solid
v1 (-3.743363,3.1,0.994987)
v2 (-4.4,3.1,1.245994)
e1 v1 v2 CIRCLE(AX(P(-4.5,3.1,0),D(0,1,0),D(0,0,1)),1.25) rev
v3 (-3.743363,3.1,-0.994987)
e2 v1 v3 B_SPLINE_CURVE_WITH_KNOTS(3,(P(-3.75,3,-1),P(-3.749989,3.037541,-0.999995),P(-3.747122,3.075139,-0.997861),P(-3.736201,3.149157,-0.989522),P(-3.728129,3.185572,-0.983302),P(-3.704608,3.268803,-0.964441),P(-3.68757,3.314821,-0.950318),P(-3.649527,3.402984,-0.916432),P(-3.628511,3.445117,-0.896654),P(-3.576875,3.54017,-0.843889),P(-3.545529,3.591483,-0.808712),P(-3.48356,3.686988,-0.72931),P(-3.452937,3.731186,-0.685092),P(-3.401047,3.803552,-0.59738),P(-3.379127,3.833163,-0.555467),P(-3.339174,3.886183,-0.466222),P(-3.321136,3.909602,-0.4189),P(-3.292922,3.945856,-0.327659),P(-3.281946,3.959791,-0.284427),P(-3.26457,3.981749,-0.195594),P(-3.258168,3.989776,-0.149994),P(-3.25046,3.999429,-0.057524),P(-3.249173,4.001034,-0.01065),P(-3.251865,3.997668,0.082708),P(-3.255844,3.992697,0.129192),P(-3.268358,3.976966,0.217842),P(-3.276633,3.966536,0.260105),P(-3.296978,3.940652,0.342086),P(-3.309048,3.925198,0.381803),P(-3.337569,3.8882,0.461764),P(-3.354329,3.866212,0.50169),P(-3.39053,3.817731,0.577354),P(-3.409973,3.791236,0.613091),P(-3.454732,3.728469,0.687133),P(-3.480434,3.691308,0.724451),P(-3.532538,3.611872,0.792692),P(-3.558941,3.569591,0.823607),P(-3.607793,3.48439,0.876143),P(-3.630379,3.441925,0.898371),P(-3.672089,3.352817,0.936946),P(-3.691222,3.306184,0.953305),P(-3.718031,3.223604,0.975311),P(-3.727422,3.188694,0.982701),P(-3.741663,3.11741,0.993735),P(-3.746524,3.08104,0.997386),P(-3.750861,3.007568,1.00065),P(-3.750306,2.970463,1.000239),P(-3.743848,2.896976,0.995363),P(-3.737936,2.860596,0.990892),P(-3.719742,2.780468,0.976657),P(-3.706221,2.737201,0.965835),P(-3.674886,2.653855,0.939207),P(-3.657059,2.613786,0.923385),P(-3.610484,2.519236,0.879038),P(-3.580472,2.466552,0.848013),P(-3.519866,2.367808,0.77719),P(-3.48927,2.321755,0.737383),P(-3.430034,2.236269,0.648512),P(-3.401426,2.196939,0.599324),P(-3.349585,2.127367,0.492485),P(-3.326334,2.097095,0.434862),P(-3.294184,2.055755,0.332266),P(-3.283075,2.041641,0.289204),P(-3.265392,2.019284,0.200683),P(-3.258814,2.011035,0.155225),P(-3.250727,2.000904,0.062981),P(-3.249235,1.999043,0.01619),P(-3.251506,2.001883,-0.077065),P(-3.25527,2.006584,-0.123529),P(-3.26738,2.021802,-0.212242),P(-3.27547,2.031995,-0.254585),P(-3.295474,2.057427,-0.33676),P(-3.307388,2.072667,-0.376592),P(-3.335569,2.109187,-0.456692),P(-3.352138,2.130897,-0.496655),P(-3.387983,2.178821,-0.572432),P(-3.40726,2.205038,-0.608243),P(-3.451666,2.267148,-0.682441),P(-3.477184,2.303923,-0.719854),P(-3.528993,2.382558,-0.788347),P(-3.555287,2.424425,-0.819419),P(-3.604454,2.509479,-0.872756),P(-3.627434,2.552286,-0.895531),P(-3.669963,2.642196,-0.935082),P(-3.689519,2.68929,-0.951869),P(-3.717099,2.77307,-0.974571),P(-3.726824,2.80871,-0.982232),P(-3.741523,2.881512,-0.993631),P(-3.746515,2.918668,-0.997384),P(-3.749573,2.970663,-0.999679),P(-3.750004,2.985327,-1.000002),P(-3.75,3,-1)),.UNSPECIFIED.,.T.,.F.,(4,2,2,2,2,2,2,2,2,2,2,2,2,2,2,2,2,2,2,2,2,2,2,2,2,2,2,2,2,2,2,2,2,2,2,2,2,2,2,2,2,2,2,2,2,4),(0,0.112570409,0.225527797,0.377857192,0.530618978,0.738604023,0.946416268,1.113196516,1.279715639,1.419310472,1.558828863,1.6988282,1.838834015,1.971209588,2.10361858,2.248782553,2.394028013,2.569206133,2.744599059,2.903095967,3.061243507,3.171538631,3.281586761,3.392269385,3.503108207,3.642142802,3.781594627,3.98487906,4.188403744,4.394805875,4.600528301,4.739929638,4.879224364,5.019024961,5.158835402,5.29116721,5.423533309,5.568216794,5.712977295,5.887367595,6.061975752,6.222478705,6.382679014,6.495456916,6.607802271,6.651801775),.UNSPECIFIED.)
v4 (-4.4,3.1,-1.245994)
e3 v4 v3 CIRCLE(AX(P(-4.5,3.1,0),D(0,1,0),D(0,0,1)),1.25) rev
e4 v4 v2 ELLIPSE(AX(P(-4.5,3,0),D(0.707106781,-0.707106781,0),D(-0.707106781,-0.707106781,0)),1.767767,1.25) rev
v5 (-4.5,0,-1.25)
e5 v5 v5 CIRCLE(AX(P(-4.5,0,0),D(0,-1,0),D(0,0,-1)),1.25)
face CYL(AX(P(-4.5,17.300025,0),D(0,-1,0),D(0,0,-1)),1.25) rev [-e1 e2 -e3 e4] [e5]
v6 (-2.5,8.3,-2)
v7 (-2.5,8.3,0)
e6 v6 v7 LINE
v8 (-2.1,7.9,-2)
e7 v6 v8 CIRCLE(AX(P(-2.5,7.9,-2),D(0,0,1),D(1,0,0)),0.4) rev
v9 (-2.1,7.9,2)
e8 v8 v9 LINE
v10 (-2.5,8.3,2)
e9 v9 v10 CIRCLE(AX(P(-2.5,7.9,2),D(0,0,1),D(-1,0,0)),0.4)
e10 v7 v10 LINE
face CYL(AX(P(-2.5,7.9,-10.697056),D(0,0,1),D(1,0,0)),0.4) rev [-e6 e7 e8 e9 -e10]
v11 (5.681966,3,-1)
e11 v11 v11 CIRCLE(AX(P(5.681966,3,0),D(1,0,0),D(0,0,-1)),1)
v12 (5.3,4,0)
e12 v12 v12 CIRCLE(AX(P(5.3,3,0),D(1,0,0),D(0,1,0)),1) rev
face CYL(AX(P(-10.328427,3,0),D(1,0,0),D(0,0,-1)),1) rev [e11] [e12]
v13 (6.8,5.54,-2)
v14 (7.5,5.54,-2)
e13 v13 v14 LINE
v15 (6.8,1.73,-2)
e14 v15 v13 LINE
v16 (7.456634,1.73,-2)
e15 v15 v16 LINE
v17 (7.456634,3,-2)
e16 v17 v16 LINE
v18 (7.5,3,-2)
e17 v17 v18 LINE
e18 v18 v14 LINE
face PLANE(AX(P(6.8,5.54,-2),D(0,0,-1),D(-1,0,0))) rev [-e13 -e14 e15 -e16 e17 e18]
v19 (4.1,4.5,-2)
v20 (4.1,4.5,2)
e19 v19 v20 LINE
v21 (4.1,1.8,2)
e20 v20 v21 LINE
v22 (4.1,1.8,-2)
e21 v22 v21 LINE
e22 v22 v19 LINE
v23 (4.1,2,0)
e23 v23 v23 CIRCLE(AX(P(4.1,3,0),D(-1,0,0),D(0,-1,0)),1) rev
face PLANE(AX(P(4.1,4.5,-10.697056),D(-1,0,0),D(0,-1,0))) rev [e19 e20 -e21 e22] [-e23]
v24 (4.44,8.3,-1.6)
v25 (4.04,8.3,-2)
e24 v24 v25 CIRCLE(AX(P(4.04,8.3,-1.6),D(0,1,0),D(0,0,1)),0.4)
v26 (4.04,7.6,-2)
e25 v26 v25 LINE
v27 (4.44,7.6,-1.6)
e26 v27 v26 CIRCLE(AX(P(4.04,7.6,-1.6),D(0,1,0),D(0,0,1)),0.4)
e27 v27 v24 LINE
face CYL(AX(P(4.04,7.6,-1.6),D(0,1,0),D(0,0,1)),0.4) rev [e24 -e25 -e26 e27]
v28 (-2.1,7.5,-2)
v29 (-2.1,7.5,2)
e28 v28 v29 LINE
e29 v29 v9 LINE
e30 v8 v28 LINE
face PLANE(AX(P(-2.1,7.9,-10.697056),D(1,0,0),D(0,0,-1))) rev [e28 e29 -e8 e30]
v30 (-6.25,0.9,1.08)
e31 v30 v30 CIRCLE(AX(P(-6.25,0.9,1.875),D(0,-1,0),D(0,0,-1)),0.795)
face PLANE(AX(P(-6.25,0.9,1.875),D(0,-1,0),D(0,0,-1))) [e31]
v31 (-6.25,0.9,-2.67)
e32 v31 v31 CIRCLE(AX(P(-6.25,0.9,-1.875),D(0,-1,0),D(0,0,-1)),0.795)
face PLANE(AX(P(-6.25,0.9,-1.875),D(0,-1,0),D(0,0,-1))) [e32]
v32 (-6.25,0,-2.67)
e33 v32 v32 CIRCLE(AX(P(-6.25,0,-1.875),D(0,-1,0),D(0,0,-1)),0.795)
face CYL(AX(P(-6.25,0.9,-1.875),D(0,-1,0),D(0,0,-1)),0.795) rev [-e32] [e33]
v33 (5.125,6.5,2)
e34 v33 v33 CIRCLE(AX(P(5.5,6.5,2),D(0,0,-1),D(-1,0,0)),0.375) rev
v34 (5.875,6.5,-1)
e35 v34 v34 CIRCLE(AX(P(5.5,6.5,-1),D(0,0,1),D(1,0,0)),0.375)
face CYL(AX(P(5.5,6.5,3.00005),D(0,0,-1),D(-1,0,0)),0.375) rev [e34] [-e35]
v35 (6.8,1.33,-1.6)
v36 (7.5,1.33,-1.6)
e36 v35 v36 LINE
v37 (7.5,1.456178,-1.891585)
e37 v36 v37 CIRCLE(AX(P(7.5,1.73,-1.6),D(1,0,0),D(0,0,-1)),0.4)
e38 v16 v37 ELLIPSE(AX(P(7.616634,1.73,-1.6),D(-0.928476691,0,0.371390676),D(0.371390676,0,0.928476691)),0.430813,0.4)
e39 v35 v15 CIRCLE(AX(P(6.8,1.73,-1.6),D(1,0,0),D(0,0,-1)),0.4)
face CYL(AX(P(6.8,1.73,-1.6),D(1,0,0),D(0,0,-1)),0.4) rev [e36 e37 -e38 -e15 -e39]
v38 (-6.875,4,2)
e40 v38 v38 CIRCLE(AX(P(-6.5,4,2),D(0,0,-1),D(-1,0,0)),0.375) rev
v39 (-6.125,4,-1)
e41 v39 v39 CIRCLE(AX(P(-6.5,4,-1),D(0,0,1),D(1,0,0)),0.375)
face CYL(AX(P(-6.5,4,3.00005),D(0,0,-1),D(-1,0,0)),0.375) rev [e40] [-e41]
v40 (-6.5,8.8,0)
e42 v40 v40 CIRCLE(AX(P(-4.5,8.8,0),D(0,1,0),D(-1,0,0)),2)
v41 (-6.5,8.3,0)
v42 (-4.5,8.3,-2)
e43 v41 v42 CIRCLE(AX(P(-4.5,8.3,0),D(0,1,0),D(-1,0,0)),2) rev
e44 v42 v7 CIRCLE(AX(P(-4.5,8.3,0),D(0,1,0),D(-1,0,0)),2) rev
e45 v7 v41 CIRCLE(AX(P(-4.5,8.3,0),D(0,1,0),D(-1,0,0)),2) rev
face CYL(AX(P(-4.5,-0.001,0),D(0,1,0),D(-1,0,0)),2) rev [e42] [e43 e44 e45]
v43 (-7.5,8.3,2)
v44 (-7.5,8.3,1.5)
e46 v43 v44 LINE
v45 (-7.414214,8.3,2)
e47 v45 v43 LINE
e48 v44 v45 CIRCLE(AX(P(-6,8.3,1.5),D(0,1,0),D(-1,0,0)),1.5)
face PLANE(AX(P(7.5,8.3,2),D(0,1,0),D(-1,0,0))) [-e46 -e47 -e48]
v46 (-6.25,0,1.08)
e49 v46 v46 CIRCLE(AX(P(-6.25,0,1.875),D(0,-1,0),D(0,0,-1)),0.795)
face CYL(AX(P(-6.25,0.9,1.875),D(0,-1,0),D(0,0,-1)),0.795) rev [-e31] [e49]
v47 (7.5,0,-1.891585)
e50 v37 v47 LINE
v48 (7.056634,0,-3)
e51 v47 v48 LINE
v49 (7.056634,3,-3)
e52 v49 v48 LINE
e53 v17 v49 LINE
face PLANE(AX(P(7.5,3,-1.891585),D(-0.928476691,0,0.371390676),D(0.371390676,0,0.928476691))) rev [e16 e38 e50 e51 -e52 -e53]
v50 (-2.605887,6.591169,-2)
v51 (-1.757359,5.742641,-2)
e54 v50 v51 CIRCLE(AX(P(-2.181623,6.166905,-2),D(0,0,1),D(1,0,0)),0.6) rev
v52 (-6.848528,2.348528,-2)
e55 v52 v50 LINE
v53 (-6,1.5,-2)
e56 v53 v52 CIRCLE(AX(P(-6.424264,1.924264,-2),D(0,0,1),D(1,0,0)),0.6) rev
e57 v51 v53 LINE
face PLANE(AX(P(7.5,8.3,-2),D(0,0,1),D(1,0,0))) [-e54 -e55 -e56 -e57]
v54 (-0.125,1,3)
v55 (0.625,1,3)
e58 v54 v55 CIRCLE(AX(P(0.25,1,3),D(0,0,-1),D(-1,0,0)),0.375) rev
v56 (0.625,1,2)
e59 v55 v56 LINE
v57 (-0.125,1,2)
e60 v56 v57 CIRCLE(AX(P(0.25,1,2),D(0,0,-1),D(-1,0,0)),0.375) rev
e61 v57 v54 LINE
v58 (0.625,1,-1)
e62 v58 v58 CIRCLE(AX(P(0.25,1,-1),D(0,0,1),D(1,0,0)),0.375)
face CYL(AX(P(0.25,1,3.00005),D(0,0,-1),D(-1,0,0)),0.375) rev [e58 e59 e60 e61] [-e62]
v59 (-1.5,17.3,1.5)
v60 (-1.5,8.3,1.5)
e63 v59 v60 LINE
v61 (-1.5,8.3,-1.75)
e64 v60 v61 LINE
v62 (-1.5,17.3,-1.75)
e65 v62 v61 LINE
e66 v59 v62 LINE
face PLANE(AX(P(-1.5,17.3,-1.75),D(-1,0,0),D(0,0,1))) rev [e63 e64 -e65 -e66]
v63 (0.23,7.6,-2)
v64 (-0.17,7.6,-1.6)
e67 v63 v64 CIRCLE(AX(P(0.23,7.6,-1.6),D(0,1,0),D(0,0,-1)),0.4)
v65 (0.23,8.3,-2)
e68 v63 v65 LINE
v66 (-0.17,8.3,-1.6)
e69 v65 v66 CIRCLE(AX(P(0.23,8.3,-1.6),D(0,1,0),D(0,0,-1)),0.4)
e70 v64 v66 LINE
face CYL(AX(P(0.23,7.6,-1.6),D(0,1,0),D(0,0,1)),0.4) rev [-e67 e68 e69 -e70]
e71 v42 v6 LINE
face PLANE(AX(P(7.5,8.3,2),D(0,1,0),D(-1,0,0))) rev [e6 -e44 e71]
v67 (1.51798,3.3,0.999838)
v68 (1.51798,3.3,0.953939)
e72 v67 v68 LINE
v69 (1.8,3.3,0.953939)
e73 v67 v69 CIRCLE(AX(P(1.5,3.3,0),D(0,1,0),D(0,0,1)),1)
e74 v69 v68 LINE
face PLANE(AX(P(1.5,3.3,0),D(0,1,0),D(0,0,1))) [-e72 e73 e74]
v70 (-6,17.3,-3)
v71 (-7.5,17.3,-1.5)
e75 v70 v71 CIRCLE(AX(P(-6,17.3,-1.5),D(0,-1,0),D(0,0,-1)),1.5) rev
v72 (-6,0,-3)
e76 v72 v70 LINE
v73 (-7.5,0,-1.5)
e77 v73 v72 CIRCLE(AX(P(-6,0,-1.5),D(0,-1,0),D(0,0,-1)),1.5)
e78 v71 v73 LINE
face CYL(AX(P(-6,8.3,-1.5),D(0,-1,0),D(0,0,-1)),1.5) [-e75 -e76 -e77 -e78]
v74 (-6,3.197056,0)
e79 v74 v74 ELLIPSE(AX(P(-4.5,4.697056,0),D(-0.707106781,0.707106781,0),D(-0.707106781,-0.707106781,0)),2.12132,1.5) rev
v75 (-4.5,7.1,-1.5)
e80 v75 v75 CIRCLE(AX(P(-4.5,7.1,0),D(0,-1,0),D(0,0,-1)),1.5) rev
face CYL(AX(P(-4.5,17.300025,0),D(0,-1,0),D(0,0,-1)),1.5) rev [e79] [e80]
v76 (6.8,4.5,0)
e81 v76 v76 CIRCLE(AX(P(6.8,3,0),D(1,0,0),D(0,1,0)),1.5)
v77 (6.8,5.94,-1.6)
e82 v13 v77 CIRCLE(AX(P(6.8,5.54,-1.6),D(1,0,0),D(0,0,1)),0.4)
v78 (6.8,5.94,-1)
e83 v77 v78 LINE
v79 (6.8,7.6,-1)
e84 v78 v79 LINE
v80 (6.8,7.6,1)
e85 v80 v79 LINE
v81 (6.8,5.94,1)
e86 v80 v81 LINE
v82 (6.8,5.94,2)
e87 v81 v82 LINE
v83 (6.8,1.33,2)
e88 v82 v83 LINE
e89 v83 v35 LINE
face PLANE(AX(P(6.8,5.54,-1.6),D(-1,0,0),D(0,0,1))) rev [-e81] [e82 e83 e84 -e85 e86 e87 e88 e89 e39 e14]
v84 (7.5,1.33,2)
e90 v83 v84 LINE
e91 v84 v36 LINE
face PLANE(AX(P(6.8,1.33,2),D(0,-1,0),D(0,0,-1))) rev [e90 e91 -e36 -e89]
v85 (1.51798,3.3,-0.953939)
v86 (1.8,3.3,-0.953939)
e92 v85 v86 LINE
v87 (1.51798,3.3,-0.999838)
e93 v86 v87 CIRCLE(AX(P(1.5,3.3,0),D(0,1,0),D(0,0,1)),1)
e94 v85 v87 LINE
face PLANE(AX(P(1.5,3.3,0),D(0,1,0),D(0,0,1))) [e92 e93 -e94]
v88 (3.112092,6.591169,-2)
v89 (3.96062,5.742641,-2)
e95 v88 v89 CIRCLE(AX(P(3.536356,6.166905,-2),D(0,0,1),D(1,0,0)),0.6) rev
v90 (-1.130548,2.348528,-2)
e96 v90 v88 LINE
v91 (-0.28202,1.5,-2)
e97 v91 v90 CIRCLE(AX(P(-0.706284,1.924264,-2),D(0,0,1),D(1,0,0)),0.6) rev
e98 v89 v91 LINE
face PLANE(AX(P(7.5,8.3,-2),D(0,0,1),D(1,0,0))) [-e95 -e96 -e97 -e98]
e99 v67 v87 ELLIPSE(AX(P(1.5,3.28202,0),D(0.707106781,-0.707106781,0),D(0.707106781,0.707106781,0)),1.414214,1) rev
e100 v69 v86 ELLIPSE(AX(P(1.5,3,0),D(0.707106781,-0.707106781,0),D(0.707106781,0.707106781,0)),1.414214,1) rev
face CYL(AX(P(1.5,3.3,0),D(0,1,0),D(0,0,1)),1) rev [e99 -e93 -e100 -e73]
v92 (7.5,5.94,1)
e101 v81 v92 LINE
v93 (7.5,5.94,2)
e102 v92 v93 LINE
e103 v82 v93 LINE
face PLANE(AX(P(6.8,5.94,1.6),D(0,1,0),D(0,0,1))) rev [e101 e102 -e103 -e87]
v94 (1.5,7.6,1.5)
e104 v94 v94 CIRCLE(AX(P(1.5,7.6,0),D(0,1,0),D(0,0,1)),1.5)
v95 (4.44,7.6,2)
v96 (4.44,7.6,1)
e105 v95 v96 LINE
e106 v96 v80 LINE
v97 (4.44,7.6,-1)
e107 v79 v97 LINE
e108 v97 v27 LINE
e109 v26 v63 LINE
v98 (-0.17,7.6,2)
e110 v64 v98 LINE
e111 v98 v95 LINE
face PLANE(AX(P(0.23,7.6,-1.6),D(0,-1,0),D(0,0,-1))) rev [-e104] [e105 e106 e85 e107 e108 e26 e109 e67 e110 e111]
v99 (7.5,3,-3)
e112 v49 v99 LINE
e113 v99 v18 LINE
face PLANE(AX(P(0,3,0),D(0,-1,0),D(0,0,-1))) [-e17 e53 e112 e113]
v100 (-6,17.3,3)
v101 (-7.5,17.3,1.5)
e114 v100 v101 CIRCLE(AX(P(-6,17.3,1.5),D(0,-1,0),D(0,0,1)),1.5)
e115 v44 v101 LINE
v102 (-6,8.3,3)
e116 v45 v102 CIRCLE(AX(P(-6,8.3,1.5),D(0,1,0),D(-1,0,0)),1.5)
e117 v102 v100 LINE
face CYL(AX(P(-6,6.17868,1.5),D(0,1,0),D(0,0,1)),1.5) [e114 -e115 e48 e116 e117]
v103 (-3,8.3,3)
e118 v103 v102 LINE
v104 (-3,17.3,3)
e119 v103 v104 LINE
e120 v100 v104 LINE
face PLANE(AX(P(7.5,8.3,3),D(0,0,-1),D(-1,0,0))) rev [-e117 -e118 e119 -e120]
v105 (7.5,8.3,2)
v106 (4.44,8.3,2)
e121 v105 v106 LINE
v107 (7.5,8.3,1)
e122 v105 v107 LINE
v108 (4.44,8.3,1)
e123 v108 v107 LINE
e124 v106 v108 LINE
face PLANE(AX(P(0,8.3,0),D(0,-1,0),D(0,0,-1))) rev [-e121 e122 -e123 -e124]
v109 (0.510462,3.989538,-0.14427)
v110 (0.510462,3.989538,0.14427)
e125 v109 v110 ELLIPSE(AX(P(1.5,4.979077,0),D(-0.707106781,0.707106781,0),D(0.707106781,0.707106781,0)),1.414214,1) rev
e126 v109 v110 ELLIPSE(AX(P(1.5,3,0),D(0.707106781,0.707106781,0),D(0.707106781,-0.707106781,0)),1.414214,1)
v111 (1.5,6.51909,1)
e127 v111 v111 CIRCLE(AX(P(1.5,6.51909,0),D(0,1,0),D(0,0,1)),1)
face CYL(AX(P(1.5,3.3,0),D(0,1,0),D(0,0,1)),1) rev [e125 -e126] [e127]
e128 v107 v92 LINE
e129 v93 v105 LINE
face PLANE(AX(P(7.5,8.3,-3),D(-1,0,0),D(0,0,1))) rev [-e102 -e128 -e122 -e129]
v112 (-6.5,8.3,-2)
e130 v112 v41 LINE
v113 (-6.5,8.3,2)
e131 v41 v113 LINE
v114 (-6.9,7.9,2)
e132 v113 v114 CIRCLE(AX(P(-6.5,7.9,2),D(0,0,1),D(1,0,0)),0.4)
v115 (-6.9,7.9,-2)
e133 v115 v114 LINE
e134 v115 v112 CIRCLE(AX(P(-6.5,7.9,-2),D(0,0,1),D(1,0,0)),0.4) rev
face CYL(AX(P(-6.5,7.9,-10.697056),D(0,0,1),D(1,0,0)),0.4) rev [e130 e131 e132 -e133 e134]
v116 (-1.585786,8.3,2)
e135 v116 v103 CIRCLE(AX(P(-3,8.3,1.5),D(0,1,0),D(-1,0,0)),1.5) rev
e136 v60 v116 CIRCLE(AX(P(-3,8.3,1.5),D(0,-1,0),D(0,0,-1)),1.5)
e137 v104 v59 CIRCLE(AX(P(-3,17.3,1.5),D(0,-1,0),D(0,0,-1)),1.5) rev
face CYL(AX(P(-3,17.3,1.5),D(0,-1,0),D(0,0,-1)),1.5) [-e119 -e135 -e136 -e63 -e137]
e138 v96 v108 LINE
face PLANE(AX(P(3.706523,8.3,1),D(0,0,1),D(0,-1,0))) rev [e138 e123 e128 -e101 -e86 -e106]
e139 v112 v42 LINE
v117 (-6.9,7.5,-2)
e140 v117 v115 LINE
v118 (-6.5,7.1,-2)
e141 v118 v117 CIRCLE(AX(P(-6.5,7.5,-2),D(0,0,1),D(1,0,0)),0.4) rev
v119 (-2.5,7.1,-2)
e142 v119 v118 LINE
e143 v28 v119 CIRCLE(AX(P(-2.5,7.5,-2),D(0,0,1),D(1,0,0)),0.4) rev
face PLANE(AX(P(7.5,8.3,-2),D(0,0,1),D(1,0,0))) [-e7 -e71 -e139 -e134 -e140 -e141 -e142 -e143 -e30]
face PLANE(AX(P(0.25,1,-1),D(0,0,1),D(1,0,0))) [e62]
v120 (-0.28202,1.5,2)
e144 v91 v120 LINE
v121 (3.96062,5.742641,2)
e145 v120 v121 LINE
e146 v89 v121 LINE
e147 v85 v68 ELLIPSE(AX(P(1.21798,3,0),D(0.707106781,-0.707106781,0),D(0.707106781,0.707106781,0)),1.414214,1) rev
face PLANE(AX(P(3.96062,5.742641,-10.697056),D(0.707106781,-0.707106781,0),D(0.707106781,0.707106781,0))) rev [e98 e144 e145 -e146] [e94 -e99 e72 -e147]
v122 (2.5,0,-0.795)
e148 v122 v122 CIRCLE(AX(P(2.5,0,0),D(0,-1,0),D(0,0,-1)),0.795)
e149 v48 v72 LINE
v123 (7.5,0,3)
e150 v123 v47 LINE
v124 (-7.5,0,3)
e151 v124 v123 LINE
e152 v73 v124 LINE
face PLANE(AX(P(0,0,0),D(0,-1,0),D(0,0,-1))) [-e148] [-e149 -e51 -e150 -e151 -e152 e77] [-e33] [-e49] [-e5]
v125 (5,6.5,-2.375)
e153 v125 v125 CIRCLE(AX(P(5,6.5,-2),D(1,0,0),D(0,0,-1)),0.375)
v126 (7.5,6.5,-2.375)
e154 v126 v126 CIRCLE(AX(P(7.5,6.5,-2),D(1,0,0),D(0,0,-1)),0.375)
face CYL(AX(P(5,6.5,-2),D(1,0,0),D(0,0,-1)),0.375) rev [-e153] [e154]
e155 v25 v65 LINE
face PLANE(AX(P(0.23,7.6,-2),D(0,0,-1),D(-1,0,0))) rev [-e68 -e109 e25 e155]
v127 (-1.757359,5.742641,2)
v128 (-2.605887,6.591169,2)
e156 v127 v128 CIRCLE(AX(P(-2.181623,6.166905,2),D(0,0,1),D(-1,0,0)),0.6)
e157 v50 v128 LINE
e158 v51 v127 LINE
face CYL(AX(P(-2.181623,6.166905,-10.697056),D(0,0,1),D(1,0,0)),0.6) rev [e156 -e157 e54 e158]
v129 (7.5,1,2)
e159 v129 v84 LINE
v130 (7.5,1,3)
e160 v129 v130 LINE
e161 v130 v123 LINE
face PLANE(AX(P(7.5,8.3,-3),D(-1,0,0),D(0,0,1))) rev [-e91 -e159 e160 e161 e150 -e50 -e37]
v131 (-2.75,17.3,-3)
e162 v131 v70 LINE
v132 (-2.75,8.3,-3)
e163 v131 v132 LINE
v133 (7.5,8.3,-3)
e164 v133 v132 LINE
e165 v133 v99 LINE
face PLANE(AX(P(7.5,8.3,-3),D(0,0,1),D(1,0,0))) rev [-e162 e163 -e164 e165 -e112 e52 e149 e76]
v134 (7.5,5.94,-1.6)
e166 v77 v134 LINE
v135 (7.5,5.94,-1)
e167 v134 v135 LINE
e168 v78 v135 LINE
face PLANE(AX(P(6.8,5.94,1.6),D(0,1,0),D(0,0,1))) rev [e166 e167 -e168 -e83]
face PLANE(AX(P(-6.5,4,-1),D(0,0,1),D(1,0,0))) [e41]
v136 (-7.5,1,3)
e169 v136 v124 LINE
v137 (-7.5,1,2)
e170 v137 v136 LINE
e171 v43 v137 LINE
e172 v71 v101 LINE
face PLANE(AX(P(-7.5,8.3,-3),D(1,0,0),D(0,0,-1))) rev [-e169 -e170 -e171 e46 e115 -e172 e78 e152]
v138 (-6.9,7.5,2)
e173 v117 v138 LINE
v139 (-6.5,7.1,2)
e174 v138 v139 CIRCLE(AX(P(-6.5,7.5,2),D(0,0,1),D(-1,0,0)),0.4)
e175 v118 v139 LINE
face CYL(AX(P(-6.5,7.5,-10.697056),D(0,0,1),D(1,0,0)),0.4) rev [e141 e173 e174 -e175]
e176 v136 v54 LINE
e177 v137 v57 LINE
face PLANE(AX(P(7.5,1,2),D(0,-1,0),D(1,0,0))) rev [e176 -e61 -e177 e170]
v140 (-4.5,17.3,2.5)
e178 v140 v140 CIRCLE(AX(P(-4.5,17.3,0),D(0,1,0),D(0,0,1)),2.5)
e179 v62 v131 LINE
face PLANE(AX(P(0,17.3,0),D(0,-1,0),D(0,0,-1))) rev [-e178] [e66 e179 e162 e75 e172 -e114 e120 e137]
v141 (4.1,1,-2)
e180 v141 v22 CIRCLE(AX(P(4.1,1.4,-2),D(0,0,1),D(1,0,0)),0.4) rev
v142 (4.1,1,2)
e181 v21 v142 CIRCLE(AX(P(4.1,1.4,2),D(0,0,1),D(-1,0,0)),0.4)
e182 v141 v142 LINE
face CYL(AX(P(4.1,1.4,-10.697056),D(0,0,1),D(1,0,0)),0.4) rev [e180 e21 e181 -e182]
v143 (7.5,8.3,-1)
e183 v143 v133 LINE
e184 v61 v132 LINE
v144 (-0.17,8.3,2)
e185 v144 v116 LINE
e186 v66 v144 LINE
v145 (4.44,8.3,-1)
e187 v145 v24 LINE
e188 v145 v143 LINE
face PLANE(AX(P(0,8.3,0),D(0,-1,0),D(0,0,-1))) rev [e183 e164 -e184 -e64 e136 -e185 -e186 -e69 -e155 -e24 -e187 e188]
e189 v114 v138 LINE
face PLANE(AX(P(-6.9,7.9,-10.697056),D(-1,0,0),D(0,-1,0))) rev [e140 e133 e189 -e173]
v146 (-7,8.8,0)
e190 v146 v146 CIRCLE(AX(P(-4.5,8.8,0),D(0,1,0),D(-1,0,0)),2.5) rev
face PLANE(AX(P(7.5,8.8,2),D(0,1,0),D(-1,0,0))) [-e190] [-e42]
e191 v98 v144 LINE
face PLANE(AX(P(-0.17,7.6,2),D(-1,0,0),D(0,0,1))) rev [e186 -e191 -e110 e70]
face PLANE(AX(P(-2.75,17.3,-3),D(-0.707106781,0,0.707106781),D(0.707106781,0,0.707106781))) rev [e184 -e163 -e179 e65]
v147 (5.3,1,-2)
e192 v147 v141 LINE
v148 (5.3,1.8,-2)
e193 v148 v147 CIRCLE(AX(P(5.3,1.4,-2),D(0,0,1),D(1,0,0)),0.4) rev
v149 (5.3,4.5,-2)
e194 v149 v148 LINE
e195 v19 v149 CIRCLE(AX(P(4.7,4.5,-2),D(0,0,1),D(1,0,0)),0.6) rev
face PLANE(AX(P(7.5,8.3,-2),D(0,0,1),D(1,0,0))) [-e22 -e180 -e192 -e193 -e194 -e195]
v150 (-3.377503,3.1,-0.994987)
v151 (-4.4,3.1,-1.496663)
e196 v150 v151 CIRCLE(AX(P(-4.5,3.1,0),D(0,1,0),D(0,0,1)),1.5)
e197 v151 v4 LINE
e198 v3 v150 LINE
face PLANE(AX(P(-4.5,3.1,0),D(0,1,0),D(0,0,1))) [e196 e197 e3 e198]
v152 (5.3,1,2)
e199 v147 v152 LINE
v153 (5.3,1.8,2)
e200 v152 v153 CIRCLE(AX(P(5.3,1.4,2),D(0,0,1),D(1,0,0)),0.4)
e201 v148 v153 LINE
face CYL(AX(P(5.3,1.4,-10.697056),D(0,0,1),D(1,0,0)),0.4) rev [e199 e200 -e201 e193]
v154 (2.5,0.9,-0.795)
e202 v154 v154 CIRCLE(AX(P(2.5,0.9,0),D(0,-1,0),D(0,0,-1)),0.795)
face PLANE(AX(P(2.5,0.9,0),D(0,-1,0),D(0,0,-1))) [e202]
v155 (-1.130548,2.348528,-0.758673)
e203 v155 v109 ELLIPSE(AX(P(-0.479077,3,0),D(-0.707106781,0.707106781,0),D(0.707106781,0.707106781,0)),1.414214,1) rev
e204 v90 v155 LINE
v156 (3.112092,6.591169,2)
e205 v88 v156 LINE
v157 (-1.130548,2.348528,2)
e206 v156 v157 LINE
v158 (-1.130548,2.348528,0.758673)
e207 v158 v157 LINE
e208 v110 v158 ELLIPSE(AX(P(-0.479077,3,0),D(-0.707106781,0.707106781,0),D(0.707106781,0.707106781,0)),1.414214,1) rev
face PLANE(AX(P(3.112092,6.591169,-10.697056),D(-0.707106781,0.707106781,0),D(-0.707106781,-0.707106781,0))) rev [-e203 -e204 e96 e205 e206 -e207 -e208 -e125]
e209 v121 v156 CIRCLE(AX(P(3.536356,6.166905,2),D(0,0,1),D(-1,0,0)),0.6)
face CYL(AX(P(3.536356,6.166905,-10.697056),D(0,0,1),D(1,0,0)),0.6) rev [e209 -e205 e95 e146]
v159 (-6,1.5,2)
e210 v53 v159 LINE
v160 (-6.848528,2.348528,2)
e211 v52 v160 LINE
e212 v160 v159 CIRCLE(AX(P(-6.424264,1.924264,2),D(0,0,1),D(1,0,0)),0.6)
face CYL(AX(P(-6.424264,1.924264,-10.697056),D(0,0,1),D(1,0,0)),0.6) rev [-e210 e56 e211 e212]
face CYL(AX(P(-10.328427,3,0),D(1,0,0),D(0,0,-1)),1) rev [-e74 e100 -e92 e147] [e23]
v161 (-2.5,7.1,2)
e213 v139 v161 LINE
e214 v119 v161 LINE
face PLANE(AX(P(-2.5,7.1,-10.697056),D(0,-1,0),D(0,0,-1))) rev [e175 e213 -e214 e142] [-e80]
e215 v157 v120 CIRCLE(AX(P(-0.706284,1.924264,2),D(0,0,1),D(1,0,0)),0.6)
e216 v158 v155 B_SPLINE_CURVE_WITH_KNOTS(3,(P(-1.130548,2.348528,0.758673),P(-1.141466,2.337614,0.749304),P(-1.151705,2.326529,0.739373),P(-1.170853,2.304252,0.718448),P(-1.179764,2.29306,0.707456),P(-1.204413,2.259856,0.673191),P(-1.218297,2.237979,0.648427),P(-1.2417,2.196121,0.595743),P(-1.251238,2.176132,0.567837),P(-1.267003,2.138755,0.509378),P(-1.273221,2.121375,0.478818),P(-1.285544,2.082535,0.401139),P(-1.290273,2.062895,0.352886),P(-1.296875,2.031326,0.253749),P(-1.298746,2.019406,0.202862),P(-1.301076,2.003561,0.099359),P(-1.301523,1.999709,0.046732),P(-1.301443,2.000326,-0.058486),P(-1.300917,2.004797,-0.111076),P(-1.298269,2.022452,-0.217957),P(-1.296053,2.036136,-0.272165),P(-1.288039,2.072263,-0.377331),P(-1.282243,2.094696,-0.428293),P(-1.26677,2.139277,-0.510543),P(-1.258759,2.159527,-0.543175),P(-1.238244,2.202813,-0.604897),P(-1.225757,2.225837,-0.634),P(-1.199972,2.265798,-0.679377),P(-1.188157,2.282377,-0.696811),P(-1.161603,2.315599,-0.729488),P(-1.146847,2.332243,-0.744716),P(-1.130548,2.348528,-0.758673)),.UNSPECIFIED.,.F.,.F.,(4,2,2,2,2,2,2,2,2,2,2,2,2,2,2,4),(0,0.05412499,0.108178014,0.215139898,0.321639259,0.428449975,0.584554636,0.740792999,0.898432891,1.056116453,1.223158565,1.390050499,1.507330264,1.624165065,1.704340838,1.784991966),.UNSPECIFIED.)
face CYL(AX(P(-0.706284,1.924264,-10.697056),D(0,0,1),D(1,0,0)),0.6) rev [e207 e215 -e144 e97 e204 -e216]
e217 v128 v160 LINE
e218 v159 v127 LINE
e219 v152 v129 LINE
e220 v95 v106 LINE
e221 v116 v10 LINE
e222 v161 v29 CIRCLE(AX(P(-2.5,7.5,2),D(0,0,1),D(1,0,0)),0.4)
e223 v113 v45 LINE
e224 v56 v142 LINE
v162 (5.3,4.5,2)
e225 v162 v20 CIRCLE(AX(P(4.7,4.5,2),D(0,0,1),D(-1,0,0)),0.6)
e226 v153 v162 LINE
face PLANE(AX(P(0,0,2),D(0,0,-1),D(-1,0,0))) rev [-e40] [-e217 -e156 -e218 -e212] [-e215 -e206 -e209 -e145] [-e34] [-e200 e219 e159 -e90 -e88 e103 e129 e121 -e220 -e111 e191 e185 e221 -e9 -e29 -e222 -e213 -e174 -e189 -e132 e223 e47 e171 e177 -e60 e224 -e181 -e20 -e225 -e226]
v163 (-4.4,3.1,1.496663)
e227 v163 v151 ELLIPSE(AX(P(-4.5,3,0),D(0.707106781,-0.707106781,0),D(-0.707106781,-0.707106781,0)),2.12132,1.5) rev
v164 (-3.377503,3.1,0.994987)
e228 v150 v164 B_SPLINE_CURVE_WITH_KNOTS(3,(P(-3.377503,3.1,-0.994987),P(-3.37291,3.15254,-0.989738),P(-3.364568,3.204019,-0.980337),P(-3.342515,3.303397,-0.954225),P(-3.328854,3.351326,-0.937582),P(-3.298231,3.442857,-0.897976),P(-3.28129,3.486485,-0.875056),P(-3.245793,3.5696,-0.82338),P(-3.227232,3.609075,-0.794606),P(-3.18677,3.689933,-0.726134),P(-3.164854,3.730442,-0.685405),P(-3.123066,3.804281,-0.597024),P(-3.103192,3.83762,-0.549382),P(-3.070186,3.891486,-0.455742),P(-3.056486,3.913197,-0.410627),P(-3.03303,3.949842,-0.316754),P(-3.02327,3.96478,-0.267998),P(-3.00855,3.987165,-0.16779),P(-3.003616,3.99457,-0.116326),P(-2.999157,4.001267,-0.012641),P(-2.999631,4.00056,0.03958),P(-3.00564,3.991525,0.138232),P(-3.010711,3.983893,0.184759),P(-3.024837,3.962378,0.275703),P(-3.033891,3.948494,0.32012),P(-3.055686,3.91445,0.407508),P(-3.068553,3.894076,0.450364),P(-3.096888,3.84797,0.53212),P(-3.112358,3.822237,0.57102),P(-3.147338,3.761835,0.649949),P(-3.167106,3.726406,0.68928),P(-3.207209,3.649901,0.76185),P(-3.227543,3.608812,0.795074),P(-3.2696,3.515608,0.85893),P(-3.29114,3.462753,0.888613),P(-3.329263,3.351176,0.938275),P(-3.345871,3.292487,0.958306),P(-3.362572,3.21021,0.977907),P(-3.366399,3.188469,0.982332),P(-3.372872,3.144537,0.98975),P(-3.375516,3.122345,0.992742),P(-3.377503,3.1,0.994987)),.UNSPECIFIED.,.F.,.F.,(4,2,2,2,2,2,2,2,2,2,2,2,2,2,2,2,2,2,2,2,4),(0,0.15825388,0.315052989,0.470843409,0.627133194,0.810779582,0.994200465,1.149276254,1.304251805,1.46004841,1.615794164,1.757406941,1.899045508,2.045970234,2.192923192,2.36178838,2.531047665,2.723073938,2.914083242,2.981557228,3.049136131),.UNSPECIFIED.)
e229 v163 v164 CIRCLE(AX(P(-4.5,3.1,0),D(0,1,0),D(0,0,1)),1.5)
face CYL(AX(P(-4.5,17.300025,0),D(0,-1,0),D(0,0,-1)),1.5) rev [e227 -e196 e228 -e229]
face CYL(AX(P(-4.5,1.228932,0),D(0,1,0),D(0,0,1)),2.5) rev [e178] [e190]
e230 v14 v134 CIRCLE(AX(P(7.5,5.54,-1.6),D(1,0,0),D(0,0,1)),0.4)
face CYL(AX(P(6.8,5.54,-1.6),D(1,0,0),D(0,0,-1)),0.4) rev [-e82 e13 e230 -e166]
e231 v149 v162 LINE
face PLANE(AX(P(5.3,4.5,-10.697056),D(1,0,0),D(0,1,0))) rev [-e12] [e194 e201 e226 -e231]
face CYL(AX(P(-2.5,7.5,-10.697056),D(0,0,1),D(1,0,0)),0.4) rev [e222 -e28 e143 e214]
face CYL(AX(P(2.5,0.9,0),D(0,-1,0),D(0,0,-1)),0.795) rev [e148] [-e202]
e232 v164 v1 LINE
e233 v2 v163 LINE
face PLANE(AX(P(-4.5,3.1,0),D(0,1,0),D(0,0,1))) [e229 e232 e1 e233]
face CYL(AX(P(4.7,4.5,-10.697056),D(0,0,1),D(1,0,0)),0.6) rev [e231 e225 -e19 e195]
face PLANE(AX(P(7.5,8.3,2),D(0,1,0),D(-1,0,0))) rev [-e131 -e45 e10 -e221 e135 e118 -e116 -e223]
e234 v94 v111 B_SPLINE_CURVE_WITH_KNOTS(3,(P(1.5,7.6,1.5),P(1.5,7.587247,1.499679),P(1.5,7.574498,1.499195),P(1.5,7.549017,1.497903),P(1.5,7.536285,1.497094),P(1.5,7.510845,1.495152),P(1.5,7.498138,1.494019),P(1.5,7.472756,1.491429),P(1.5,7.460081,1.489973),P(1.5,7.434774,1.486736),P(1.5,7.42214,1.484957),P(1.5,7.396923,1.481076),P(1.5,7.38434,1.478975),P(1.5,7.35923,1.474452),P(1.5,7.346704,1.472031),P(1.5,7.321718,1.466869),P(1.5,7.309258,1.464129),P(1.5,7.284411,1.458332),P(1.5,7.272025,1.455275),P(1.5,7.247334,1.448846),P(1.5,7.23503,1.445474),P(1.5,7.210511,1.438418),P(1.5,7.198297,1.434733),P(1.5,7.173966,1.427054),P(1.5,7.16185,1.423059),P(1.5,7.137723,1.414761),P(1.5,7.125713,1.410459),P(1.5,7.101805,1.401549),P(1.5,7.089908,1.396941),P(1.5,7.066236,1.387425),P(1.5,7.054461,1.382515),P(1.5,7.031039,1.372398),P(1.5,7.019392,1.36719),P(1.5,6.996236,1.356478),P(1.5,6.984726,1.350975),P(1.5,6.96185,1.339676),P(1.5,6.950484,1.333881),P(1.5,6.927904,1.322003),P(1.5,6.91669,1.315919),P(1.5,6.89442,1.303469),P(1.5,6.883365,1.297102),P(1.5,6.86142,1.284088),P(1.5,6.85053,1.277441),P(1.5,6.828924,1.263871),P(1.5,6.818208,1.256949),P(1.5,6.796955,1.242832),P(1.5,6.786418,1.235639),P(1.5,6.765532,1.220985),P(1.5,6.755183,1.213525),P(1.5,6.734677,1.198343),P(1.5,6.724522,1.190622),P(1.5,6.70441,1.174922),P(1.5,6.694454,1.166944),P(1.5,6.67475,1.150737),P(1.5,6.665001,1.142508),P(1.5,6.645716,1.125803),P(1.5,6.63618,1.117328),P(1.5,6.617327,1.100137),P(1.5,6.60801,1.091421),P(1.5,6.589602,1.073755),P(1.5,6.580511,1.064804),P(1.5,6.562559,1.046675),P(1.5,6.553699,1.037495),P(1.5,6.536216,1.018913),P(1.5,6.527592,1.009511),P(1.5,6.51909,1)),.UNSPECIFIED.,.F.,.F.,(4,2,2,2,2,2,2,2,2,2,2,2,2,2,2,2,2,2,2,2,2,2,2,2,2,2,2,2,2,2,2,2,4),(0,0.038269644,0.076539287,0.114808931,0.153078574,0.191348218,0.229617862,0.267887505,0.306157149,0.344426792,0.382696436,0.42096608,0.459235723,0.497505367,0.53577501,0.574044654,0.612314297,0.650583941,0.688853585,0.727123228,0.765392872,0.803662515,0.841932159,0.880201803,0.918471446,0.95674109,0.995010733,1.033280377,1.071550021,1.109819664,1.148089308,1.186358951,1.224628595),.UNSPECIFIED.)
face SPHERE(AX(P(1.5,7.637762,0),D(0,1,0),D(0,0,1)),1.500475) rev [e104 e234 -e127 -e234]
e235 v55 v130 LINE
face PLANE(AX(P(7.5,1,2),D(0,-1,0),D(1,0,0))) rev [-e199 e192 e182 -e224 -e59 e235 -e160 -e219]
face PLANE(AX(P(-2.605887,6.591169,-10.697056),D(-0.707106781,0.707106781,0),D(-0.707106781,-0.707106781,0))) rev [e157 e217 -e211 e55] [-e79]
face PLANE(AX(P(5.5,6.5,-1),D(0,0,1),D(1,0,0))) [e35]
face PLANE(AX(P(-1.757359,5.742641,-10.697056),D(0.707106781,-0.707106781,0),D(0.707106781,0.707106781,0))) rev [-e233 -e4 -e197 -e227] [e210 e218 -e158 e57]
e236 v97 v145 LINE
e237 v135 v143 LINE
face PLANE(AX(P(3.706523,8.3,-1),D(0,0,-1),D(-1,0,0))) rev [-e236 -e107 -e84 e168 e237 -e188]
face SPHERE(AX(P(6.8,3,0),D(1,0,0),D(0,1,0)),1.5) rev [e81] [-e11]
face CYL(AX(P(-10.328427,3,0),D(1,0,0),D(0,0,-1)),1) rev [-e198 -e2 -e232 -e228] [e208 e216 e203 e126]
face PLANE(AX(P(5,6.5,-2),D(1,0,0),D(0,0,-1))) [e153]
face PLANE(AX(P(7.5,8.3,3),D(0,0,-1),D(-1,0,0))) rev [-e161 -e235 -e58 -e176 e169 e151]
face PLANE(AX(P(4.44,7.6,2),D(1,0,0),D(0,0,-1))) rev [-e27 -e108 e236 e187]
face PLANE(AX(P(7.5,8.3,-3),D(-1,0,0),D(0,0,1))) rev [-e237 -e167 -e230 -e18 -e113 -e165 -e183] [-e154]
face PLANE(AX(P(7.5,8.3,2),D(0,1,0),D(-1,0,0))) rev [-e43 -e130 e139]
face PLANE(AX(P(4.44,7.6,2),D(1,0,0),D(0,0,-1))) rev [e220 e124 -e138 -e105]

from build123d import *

# Parameters (mm, degrees)
SKETCH1_W                        = 15
SKETCH1_H                        = 6
MAIN_BODY_EXT_DEPTH              = 8.3
EMISSION_PATH_EXT_DEPTH          = 9
SKETCH3_R                        = 1.25
EMISSION_AND_GRIN_CUT_DEPTH      = 20.092931
SKETCH4_R                        = 1
DRUM_LENS_CUT_DEPTH              = 13
SKETCH41_R                       = 1
ADDTL_LIGHT_SOURCE_DEPTH         = 5
SKETCH5_W                        = 15
SKETCH5_H                        = 7.3
FILTERSET_CUT1_DEPTH             = 1
FILTERSET_CUT2_DEPTH             = 4
SKETCH10_R                       = 2.5
EMISSION_LENS_CUT_DEPTH          = 8.5
SKETCH15_R                       = 0.795
MAGNETS_CUT_DEPTH                = 0.9
SCREW_HOLES_CUT_DEPTH            = 20.507434
SCREW_HOLES_CUT_DEPTH_BACK       = 3
SKETCH18_R                       = 0.375
EXTERNAL_FILLET_1_R              = 1.5
CUT_EXTRUDE8_DEPTH               = 14.011149
CUT_EXTRUDE8_DEPTH_BACK          = 4
SKETCH28_R                       = 1.5
CUT_EXTRUDE9_DEPTH               = 3
CUT_EXTRUDE_ORIGINAL_LIGHT_DEPTH = 0.7
CUT_EXTRUDE_ADDTL_LIGHT_DEPTH    = 0.7
SKETCH29_R                       = 0.375
CUT_EXTRUDE11_DEPTH              = 2.5
SKETCH32_W                       = 2
SKETCH32_H                       = 2.36
CUT_EXTRUDE14_DEPTH              = 0.7
SKETCH45_W                       = 2.36
SKETCH45_H                       = 2
CUT_EXTRUDE19_DEPTH              = 0.7
CUT_EXTRUDE16_DEPTH              = 9
CUT_EXTRUDE17_REACH              = 13.945
SKETCH37_R                       = 2


with BuildPart() as part:
    # Sketch1 → Main Body Ext (new body)
    with BuildSketch(Plane(origin=(0, 0, 0), x_dir=(1, 0, 0), z_dir=(0, 1, 0))):
        Rectangle(SKETCH1_W, SKETCH1_H)
    extrude(amount=MAIN_BODY_EXT_DEPTH)

    # Sketch8 → Emission Path Ext (add)
    with BuildSketch(Plane(origin=(0, 8.3, 0), x_dir=(1, 0, 0), z_dir=(0, 1, 0))):
        Polygon((-2.75, 3), (-1.5, 1.75), (-1.5, -3), (-7.5, -3), (-7.5, 3), align=None)
    extrude(amount=EMISSION_PATH_EXT_DEPTH)

    # Sketch3 → Emission and Grin Cut (cut, through all)
    with BuildSketch(Plane.XZ):
        with Locations(Location((-4.5, 0, 0), (0, 0, 270))):
            Circle(SKETCH3_R)
    extrude(amount=-EMISSION_AND_GRIN_CUT_DEPTH, mode=Mode.SUBTRACT)

    # Sketch4 → Drum Lens Cut (cut)
    with BuildSketch(Plane(origin=(7.5, 0, 0), x_dir=(0, 0, -1), z_dir=(1, 0, 0))):
        with Locations((0, 3)):
            Circle(SKETCH4_R)
    extrude(amount=-DRUM_LENS_CUT_DEPTH, mode=Mode.SUBTRACT)

    # Sketch41 → Addtl Light Source (cut)
    with BuildSketch(Plane(origin=(0, 8.3, 0), x_dir=(1, 0, 0), z_dir=(0, 1, 0))):
        with Locations(Location((1.5, 0, 0), (0, 0, 270))):
            Circle(SKETCH41_R)
    extrude(amount=-ADDTL_LIGHT_SOURCE_DEPTH, mode=Mode.SUBTRACT)

    # Sketch5 → FilterSet Cut1 (cut)
    with BuildSketch(Plane.XY.offset(3)):
        with Locations((0, 4.65)):
            Rectangle(SKETCH5_W, SKETCH5_H)
    extrude(amount=-FILTERSET_CUT1_DEPTH, mode=Mode.SUBTRACT)

    # Sketch6 → FilterSet Cut2 (cut)
    with BuildSketch(Plane.XY.offset(2)):
        with BuildLine():
            Line((5.3, 4.5), (5.3, 1.8))
            ThreePointArc((5.3, 1.8), (5.7, 1.4), (5.3, 1))
            Line((5.3, 1), (4.1, 1))
            ThreePointArc((4.1, 1), (3.7, 1.4), (4.1, 1.8))
            Line((4.1, 1.8), (4.1, 4.5))
            ThreePointArc((4.1, 4.5), (4.7, 5.1), (5.3, 4.5))
        make_face()
        with BuildLine():
            Line((-6.9, 7.9), (-6.9, 7.5))
            ThreePointArc((-6.9, 7.5), (-6.782843, 7.217157), (-6.5, 7.1))
            Line((-6.5, 7.1), (-2.5, 7.1))
            ThreePointArc((-2.5, 7.1), (-2.217157, 7.217157), (-2.1, 7.5))
            Line((-2.1, 7.5), (-2.1, 7.9))
            ThreePointArc((-2.1, 7.9), (-2.217157, 8.182843), (-2.5, 8.3))
            Line((-2.5, 8.3), (-6.5, 8.3))
            ThreePointArc((-6.5, 8.3), (-6.782843, 8.182843), (-6.9, 7.9))
        make_face()
        with BuildLine():
            Line((-2.605887, 6.591169), (-6.848528, 2.348528))
            ThreePointArc((-6.848528, 2.348528), (-6.848528, 1.5), (-6, 1.5))
            Line((-6, 1.5), (-1.757359, 5.742641))
            ThreePointArc((-1.757359, 5.742641), (-1.757359, 6.591169), (-2.605887, 6.591169))
        make_face()
        with BuildLine():
            Line((3.112092, 6.591169), (-1.130548, 2.348528))
            ThreePointArc((-1.130548, 2.348528), (-1.130548, 1.5), (-0.28202, 1.5))
            Line((-0.28202, 1.5), (3.96062, 5.742641))
            ThreePointArc((3.96062, 5.742641), (3.96062, 6.591169), (3.112092, 6.591169))
        make_face()
    extrude(amount=-FILTERSET_CUT2_DEPTH, mode=Mode.SUBTRACT)

    # Sketch10 → Emission Lens Cut (cut)
    with BuildSketch(Plane(origin=(0, 17.3, 0), x_dir=(1, 0, 0), z_dir=(0, 1, 0))):
        with Locations(Location((-4.5, 0, 0), (0, 0, 270))):
            Circle(SKETCH10_R)
    extrude(amount=-EMISSION_LENS_CUT_DEPTH, mode=Mode.SUBTRACT)

    # Sketch15 → Magnets Cut (cut)
    with BuildSketch(Plane.XZ):
        with Locations(Location((-6.25, -1.875, 0), (0, 0, 270))):
            Circle(SKETCH15_R)
        with Locations(Location((-6.25, 1.875, 0), (0, 0, 270))):
            Circle(SKETCH15_R)
        with Locations(Location((2.5, 0, 0), (0, 0, 270))):
            Circle(SKETCH15_R)
    extrude(amount=-MAGNETS_CUT_DEPTH, mode=Mode.SUBTRACT)

    # Sketch18 → Screw Holes Cut (cut, two sides: drawn at the far end of the back side and taken through both)
    with BuildSketch(Plane.XY.offset(2).offset(-SCREW_HOLES_CUT_DEPTH_BACK)):
        with Locations(Location((-6.5, 4, 0), (0, 0, 180))):
            Circle(SKETCH18_R)
        with Locations(Location((5.5, 6.5, 0), (0, 0, 180))):
            Circle(SKETCH18_R)
        with Locations((0.25, 1)):
            Circle(SKETCH18_R)
    extrude(amount=SCREW_HOLES_CUT_DEPTH + SCREW_HOLES_CUT_DEPTH_BACK, mode=Mode.SUBTRACT)

    # External Fillet 1
    # the kernel refuses this fillet: 1.5 mm, written as the material it takes off along each edge
    with BuildSketch(Plane(origin=(-7.5, -3.75, -3), x_dir=(1, 0, 0), z_dir=(0, 1, 0))) as external_fillet_1_piece_1:
        with BuildLine():
            CenterArc((EXTERNAL_FILLET_1_R, -EXTERNAL_FILLET_1_R), EXTERNAL_FILLET_1_R, 90, 90)
            Line((0, -EXTERNAL_FILLET_1_R), (0, 0))
            Line((0, 0), (EXTERNAL_FILLET_1_R, 0))
        make_face()
    extrude(amount=24.8, mode=Mode.SUBTRACT)
    with BuildSketch(Plane(origin=(-1.5, 8.3, 3), x_dir=(0, 0, -1), z_dir=(0, 1, 0))) as external_fillet_1_piece_2:
        with BuildLine():
            CenterArc((EXTERNAL_FILLET_1_R, EXTERNAL_FILLET_1_R), EXTERNAL_FILLET_1_R, 180, 90)
            Line((0, EXTERNAL_FILLET_1_R), (0, 0))
            Line((0, 0), (EXTERNAL_FILLET_1_R, 0))
        make_face()
    extrude(amount=12.75, mode=Mode.SUBTRACT)

    # Sketch28 → Cut-Extrude8 (cut, two sides: drawn at the far end of the back side and taken through both)
    with BuildSketch(Plane(origin=(0, 7.1, 0), x_dir=(1, 0, 0), z_dir=(0, 1, 0)).offset(-CUT_EXTRUDE8_DEPTH_BACK)):
        with Locations(Location((-4.5, 0, 0), (0, 0, 180))):
            Circle(SKETCH28_R)
    extrude(amount=CUT_EXTRUDE8_DEPTH + CUT_EXTRUDE8_DEPTH_BACK, mode=Mode.SUBTRACT)

    # Sketch14 → Cut-Extrude9 (cut)
    with BuildSketch(Plane.XZ):
        Polygon((7.5, -3), (7.5, -1.891585), (7.056634, -3), align=None)
    extrude(amount=-CUT_EXTRUDE9_DEPTH, mode=Mode.SUBTRACT)

    # Sketch12 → Cut-Extrude Original Light (cut)
    with BuildSketch(Plane(origin=(7.5, 0, 0), x_dir=(0, 0, -1), z_dir=(1, 0, 0))):
        with BuildLine():
            Line((1.6, 5.94), (-1.6, 5.94))
            Line((-1.6, 5.94), (-2, 5.94))
            Line((-2, 5.94), (-2, 1.33))
            Line((-2, 1.33), (1.6, 1.33))
            ThreePointArc((1.6, 1.33), (1.882843, 1.447157), (2, 1.73))
            Line((2, 1.73), (2, 5.54))
            ThreePointArc((2, 5.54), (1.882843, 5.822843), (1.6, 5.94))
        make_face()
    extrude(amount=-CUT_EXTRUDE_ORIGINAL_LIGHT_DEPTH, mode=Mode.SUBTRACT)

    # Sketch44 → Cut-Extrude Addtl Light (cut)
    with BuildSketch(Plane(origin=(0, 8.3, 0), x_dir=(1, 0, 0), z_dir=(0, 1, 0))):
        with BuildLine():
            Line((-0.17, -2), (4.44, -2))
            Line((4.44, -2), (4.44, 1.6))
            ThreePointArc((4.44, 1.6), (4.322843, 1.882843), (4.04, 2))
            Line((4.04, 2), (0.23, 2))
            ThreePointArc((0.23, 2), (-0.052843, 1.882843), (-0.17, 1.6))
            Line((-0.17, 1.6), (-0.17, -2))
        make_face()
    extrude(amount=-CUT_EXTRUDE_ADDTL_LIGHT_DEPTH, mode=Mode.SUBTRACT)

    # Sketch29 → Cut-Extrude11 (cut)
    with BuildSketch(Plane(origin=(7.5, 0, 0), x_dir=(0, 0, -1), z_dir=(1, 0, 0))):
        with Locations((2, 6.5)):
            Circle(SKETCH29_R)
    extrude(amount=-CUT_EXTRUDE11_DEPTH, mode=Mode.SUBTRACT)

    # Sketch32 → Cut-Extrude14 (cut)
    with BuildSketch(Plane(origin=(7.5, 0, 0), x_dir=(0, 0, -1), z_dir=(1, 0, 0))):
        with Locations((0, 7.12)):
            Rectangle(SKETCH32_W, SKETCH32_H)
    extrude(amount=-CUT_EXTRUDE14_DEPTH, mode=Mode.SUBTRACT)

    # Sketch45 → Cut-Extrude19 (cut)
    with BuildSketch(Plane(origin=(0, 8.3, 0), x_dir=(1, 0, 0), z_dir=(0, 1, 0))):
        with Locations((5.62, 0)):
            Rectangle(SKETCH45_W, SKETCH45_H)
    extrude(amount=-CUT_EXTRUDE19_DEPTH, mode=Mode.SUBTRACT)

    # Sketch33 → Cut-Revolve1 (revolve, cut)
    with BuildSketch(Plane.XY, mode=Mode.PRIVATE) as cut_revolve1_sk:
        with BuildLine():
            Line((6.8, 3), (5.3, 3))
            ThreePointArc((5.3, 3), (5.73934, 4.06066), (6.8, 4.5))
            Line((6.8, 4.5), (6.8, 3))
        make_face()
    revolve(cut_revolve1_sk.sketch.rotate(Axis((6.8, 3, 0), (-1, 0, 0)), 84.26086), axis=Axis((6.8, 3, 0), (-1, 0, 0)), mode=Mode.SUBTRACT)

    # Sketch47 → Cut-Revolve2 (revolve, cut)
    with BuildSketch(Plane(origin=(1.5, 0, 0), x_dir=(0, 0, -1), z_dir=(1, 0, 0))):
        with BuildLine():
            Line((-1.5, 7.6), (0, 7.6))
            Line((0, 7.6), (0, 6.137287))
            ThreePointArc((0, 6.137287), (-1.04756, 6.563498), (-1.5, 7.6))
        make_face()
    revolve(axis=Axis((1.5, 7.6, 0), (0, -1, 0)), mode=Mode.SUBTRACT)

    # Sketch36 → Cut-Extrude16 (cut)
    with BuildSketch(Plane(origin=(0, 17.3, 0), x_dir=(1, 0, 0), z_dir=(0, 1, 0))):
        with BuildLine():
            Line((-7.5, -1.5), (-7.5, -3))
            Line((-7.5, -3), (-6, -3))
            ThreePointArc((-6, -3), (-7.06066, -2.56066), (-7.5, -1.5))
        make_face()
    extrude(amount=-CUT_EXTRUDE16_DEPTH, mode=Mode.SUBTRACT)

    # Sketch37 → Cut-Extrude17 (cut, up to next)
    with BuildSketch(Plane(origin=(0, 8.8, 0), x_dir=(1, 0, 0), z_dir=(0, 1, 0)), mode=Mode.PRIVATE) as cut_extrude17_sk1:
        with Locations(Location((-4.5, 0, 0), (0, 0, 180))):
            Circle(SKETCH37_R)
    cut_extrude17_tool1 = extrude(cut_extrude17_sk1.sketch, amount=-CUT_EXTRUDE17_REACH, mode=Mode.PRIVATE) & part.part
    add(cut_extrude17_tool1.solids().sort_by_distance((-4.5, 8.8, 0))[0], mode=Mode.SUBTRACT)


solid = part.part
